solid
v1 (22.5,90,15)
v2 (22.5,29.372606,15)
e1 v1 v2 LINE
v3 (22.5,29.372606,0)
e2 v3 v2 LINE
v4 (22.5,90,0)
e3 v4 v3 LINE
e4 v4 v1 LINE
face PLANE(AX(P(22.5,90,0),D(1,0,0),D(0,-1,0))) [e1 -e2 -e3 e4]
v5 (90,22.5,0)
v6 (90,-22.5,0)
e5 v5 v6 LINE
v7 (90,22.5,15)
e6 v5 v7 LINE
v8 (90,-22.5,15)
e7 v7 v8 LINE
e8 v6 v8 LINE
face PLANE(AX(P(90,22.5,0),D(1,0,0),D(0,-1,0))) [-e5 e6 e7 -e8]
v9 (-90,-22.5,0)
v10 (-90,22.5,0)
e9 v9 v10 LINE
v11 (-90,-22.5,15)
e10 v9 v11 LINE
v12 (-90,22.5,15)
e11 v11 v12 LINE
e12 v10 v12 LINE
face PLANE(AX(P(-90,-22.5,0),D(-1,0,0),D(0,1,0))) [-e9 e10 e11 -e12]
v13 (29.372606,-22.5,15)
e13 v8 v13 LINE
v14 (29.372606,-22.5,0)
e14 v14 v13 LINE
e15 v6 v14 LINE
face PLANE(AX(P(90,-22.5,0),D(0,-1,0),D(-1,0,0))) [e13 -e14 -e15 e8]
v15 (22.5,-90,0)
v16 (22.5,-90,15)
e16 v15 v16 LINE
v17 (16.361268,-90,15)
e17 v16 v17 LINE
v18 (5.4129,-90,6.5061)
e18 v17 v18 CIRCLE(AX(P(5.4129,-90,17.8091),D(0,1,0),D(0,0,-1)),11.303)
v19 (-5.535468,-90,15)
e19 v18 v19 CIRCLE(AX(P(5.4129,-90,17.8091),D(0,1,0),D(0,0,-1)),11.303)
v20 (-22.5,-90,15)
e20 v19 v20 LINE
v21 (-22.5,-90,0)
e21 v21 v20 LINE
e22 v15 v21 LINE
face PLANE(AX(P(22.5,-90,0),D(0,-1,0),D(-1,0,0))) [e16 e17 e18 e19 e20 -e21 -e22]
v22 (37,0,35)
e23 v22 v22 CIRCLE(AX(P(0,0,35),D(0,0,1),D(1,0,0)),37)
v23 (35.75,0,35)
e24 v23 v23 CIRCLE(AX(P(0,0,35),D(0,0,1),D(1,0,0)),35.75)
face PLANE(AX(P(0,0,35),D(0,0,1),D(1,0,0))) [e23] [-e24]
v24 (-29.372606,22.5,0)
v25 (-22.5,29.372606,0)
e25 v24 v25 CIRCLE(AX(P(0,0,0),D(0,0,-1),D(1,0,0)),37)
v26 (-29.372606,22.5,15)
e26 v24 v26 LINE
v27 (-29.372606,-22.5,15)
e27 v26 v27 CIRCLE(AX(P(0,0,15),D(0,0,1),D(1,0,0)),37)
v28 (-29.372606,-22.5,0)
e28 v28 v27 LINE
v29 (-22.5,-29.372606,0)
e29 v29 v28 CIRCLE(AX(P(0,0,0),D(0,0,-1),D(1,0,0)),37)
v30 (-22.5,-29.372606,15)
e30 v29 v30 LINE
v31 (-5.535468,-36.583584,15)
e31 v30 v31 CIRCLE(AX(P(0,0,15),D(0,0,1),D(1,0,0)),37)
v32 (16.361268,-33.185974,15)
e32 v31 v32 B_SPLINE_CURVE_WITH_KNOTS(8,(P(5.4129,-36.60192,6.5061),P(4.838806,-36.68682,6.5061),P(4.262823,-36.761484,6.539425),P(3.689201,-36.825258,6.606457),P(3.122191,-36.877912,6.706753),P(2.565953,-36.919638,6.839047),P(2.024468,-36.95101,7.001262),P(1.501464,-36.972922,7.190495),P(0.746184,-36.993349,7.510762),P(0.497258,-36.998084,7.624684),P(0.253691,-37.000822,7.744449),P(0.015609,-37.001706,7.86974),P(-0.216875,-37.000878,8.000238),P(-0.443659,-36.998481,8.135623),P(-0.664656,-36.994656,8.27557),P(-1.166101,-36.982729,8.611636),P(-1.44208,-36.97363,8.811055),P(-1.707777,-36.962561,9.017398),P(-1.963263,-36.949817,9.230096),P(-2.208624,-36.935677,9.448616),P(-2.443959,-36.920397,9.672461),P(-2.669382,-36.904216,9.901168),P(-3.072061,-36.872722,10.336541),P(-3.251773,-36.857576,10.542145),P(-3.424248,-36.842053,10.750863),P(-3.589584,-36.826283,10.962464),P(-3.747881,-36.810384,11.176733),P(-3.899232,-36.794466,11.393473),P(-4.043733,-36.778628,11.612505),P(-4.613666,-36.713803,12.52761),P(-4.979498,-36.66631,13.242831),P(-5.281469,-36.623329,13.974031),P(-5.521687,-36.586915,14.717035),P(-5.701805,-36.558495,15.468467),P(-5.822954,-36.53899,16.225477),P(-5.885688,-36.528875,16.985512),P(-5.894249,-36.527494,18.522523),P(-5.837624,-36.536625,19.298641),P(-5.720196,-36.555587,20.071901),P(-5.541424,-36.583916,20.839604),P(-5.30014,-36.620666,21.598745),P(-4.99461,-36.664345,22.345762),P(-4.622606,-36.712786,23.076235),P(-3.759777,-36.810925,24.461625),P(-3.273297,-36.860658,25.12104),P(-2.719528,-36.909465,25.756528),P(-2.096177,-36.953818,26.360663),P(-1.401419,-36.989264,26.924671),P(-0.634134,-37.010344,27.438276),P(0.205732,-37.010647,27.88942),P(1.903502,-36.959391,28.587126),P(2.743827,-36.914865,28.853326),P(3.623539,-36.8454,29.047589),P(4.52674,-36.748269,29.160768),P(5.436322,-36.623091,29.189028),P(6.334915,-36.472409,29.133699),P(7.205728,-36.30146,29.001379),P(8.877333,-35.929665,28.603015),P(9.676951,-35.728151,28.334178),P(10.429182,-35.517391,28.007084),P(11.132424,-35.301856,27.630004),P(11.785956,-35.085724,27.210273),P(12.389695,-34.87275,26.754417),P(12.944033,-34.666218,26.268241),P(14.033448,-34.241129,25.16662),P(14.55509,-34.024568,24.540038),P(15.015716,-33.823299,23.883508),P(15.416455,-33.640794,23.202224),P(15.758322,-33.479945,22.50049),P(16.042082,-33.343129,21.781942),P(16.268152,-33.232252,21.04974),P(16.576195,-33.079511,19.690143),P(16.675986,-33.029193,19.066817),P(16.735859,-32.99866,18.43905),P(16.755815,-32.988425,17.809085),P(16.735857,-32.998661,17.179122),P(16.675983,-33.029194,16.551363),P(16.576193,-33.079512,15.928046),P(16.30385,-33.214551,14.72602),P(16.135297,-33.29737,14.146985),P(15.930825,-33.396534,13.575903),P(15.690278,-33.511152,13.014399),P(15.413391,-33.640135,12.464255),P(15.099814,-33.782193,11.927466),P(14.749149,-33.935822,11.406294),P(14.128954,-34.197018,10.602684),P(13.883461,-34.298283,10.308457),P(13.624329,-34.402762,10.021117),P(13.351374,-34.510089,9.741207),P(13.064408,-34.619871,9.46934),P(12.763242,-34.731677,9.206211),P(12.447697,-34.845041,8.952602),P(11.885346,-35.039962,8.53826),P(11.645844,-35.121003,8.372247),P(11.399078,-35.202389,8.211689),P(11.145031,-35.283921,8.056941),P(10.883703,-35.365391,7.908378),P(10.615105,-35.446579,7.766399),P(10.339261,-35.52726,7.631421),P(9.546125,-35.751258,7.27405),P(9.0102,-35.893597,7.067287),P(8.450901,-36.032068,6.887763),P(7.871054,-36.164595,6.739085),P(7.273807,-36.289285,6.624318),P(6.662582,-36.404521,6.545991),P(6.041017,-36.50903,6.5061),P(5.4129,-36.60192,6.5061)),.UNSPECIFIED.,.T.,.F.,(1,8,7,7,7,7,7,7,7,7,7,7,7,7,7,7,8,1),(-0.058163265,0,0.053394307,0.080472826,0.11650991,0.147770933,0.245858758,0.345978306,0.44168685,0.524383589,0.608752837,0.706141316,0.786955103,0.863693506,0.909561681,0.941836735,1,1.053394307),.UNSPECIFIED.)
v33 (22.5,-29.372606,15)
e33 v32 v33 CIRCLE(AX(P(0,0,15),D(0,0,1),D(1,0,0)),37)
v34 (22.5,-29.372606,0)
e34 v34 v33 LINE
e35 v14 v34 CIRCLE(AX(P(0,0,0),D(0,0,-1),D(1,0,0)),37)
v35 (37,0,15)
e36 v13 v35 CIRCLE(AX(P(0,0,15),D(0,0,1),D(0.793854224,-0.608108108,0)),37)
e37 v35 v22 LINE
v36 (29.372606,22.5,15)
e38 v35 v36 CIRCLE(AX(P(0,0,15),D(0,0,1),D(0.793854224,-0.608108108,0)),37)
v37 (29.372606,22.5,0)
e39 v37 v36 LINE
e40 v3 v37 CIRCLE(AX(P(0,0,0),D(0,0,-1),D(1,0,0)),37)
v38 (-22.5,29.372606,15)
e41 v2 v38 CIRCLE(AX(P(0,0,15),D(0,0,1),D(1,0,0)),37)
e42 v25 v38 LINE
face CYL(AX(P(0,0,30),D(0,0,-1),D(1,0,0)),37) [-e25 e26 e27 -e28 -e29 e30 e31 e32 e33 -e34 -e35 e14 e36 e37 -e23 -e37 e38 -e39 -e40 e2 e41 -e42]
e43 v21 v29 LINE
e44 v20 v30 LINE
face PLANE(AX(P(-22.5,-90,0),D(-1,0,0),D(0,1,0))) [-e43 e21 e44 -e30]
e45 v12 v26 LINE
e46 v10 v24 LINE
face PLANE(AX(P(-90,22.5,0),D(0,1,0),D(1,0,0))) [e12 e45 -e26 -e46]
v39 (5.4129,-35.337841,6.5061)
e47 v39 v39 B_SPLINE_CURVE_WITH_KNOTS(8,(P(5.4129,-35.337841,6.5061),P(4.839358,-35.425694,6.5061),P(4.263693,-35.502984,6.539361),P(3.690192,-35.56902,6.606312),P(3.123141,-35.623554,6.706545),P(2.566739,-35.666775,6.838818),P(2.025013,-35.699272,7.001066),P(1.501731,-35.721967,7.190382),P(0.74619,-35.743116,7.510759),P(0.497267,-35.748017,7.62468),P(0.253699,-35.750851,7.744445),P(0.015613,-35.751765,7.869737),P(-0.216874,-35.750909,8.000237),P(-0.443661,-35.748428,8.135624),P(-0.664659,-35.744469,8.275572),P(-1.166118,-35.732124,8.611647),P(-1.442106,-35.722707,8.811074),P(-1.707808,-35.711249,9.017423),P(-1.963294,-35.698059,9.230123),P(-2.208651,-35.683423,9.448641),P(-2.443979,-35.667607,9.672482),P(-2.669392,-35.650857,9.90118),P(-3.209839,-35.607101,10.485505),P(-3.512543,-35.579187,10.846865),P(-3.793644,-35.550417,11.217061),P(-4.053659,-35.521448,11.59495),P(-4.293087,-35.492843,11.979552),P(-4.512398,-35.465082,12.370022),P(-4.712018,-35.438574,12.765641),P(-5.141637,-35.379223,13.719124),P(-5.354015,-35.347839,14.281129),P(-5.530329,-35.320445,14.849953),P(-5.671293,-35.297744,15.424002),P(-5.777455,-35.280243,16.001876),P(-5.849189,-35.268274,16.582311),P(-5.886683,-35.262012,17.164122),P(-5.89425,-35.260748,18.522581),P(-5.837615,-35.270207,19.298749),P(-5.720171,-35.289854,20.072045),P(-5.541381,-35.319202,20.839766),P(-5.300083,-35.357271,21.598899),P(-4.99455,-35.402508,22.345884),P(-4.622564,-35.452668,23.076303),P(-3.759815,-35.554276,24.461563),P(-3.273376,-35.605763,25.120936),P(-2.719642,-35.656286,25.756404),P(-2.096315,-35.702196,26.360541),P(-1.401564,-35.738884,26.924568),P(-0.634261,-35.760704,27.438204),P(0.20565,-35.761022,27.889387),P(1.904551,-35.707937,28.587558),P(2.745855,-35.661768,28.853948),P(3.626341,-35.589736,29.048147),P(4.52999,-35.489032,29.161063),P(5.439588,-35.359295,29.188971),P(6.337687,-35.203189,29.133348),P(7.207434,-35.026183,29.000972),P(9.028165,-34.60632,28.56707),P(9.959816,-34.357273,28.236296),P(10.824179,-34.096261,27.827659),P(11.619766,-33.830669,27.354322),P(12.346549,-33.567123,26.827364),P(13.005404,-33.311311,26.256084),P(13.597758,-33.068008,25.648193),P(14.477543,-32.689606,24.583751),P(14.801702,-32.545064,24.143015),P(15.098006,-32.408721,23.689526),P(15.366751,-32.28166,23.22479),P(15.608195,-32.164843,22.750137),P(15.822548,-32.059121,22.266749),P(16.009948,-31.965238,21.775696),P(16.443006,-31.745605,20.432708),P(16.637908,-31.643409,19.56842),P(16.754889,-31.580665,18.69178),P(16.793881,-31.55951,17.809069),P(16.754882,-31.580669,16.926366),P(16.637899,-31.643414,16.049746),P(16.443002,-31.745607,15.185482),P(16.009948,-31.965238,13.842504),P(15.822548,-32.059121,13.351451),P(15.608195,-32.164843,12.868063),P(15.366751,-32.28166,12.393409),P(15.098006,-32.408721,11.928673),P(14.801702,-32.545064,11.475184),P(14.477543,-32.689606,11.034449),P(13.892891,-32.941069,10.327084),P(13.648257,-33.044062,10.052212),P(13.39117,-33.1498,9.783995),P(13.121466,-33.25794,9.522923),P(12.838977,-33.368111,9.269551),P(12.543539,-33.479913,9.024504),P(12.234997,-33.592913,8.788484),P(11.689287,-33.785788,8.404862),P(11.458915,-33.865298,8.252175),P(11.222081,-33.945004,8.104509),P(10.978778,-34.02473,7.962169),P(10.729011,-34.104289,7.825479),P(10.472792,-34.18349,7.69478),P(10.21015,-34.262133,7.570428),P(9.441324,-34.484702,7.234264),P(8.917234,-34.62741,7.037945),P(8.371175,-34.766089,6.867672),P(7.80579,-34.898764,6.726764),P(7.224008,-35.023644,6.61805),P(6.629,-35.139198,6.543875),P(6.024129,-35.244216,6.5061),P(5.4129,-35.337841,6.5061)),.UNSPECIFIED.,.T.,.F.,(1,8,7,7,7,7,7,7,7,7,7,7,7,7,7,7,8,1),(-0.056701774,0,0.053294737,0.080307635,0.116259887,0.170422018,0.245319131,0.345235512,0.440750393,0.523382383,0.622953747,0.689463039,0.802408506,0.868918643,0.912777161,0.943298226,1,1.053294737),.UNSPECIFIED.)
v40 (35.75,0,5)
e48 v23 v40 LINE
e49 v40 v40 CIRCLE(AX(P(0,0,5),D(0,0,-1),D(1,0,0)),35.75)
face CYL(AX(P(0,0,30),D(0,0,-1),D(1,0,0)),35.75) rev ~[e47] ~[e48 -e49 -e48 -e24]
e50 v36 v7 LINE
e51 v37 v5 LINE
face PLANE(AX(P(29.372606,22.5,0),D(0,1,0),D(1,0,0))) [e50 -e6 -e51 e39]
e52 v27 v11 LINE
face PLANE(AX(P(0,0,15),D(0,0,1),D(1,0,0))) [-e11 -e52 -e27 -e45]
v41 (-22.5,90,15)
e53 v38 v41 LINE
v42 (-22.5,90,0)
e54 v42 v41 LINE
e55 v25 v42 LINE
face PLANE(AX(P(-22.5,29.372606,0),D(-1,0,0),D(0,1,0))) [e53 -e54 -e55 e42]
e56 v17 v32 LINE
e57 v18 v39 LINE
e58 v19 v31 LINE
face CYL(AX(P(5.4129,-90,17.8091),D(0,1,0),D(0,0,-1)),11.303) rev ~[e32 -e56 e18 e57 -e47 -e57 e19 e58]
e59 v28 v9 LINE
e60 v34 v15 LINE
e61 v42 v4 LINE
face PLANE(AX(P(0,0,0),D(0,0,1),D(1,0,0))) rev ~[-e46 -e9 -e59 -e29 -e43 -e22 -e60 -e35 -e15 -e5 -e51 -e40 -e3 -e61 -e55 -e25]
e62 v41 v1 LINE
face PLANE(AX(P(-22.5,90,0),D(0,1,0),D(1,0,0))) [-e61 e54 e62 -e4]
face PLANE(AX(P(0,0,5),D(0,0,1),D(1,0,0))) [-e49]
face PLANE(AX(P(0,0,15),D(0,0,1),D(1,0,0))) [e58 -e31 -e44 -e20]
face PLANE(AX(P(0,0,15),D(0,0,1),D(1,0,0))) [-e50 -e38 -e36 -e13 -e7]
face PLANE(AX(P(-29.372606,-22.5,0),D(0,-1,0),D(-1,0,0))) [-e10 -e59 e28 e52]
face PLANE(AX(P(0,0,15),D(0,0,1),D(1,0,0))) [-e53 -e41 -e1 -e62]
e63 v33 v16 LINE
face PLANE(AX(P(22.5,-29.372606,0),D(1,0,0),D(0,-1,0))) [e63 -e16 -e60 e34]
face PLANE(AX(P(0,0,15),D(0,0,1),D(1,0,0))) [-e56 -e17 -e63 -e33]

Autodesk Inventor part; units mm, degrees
ref_plane "YZ Plane" through (0, 0, 0) normal (1, 0, 0) x (0, 1, 0)
ref_plane "XZ Plane" through (0, 0, 0) normal (0, 1, 0) x (-1, 0, 0)
ref_plane "XY Plane" through (0, 0, 0) normal (0, 0, 1) x (1, 0, 0)
sketch "Sketch1" plane through (0, 0, 0) normal (0, 0, 1) x (1, 0, 0)
  circle A0 centre (0, 0) radius 35.75
  circle A1 centre (0, 0) radius 37
  line L0 (-22.5, -90) -> (-22.5, 90)
  line L1 (-22.5, 90) -> (22.5, 90)
  line L2 (22.5, 90) -> (22.5, -90)
  line L3 (22.5, -90) -> (-22.5, -90)
  line L4 (-22.5, -90) -> (22.5, 90) construction
  line L5 (-22.5, 90) -> (22.5, -90) construction
  line L6 (-90, 22.5) -> (90, 22.5)
  line L7 (90, 22.5) -> (90, -22.5)
  line L8 (90, -22.5) -> (-90, -22.5)
  line L9 (-90, -22.5) -> (-90, 22.5)
  line L10 (-90, 22.5) -> (90, -22.5) construction
  line L11 (90, 22.5) -> (-90, -22.5) construction
  point P0 (22.5, -29.3726)
  point P1 (-22.5, -29.3726)
  point P2 (-29.3726, -22.5)
  point P3 (-29.3726, 22.5)
  point P4 (-22.5, 29.3726)
  point P5 (22.5, 29.3726)
  point P6 (29.3726, 22.5)
  point P7 (29.3726, -22.5)
  dimension "d0" = 71.5
  dimension "d1" = 74
  dimension "d2" = 180
  dimension "d3" = 45
  dimension "d4" = 180
  dimension "d5" = 45
extrude "Extrusion1" add sketch "Sketch1" along normal blind 5 contours A0 L8 L2 L6 | L6 L2 A0 | A0 L2 L8 | L2 L6 L0 A0 | L2 L8 L0 L6 | A0 L0 L8 L2 | L0 L6 A0 | L0 L8 A0 L6 | A0 L8 L0
extrude "Extrusion2" add sketch "Sketch1" along normal blind 30 contours A0 L6 A1 L8 | A0 L2 A1 L6 | L8 A1 L2 A0 | A0 L0 A1 L2 | L2 A1 L0 A0 | A0 L6 A1 L0 | L0 A1 L8 A0 | A0 L8 A1 L6
extrude "Extrusion3" add sketch "Sketch1" along normal blind 15 contours L6 L7 L8 A1 | A1 L0 L1 L2 | L2 L3 L0 A1 | A1 L8 L9 L6
sketch "Sketch2" plane through (-22.5, -90, 0) normal (0, -1, 0) x (1, 0, 0)
  point P0 (22.5, 0)
  point P1 (27.9129, 17.8091)
hole "Hole1" at (5.4129, -90, 17.8091) direction (0, 1, 0) diameter 22.606 depth 88.75 tip angle 118
move faces "Move1" translate (0, 0, 5) faces at (-36.0055, 0, 30)
equation "\"BendRadius\" = Thickness"
equation "\"BendReliefWidth\" = Thickness"
equation "\"BendReliefDepth\" = 0.5 * Thickness"
equation "\"CornerReliefSize\" = 4 * Thickness"
equation "\"MinimumRemnant\" = 2 * Thickness"
equation "\"TransitionRadius\" = BendRadius"
equation "\"JacobiRadiusSize\" = BendRadius"
equation "\"GapSize\" = Thickness"
equation "\"Thickness\" = 0.5"
